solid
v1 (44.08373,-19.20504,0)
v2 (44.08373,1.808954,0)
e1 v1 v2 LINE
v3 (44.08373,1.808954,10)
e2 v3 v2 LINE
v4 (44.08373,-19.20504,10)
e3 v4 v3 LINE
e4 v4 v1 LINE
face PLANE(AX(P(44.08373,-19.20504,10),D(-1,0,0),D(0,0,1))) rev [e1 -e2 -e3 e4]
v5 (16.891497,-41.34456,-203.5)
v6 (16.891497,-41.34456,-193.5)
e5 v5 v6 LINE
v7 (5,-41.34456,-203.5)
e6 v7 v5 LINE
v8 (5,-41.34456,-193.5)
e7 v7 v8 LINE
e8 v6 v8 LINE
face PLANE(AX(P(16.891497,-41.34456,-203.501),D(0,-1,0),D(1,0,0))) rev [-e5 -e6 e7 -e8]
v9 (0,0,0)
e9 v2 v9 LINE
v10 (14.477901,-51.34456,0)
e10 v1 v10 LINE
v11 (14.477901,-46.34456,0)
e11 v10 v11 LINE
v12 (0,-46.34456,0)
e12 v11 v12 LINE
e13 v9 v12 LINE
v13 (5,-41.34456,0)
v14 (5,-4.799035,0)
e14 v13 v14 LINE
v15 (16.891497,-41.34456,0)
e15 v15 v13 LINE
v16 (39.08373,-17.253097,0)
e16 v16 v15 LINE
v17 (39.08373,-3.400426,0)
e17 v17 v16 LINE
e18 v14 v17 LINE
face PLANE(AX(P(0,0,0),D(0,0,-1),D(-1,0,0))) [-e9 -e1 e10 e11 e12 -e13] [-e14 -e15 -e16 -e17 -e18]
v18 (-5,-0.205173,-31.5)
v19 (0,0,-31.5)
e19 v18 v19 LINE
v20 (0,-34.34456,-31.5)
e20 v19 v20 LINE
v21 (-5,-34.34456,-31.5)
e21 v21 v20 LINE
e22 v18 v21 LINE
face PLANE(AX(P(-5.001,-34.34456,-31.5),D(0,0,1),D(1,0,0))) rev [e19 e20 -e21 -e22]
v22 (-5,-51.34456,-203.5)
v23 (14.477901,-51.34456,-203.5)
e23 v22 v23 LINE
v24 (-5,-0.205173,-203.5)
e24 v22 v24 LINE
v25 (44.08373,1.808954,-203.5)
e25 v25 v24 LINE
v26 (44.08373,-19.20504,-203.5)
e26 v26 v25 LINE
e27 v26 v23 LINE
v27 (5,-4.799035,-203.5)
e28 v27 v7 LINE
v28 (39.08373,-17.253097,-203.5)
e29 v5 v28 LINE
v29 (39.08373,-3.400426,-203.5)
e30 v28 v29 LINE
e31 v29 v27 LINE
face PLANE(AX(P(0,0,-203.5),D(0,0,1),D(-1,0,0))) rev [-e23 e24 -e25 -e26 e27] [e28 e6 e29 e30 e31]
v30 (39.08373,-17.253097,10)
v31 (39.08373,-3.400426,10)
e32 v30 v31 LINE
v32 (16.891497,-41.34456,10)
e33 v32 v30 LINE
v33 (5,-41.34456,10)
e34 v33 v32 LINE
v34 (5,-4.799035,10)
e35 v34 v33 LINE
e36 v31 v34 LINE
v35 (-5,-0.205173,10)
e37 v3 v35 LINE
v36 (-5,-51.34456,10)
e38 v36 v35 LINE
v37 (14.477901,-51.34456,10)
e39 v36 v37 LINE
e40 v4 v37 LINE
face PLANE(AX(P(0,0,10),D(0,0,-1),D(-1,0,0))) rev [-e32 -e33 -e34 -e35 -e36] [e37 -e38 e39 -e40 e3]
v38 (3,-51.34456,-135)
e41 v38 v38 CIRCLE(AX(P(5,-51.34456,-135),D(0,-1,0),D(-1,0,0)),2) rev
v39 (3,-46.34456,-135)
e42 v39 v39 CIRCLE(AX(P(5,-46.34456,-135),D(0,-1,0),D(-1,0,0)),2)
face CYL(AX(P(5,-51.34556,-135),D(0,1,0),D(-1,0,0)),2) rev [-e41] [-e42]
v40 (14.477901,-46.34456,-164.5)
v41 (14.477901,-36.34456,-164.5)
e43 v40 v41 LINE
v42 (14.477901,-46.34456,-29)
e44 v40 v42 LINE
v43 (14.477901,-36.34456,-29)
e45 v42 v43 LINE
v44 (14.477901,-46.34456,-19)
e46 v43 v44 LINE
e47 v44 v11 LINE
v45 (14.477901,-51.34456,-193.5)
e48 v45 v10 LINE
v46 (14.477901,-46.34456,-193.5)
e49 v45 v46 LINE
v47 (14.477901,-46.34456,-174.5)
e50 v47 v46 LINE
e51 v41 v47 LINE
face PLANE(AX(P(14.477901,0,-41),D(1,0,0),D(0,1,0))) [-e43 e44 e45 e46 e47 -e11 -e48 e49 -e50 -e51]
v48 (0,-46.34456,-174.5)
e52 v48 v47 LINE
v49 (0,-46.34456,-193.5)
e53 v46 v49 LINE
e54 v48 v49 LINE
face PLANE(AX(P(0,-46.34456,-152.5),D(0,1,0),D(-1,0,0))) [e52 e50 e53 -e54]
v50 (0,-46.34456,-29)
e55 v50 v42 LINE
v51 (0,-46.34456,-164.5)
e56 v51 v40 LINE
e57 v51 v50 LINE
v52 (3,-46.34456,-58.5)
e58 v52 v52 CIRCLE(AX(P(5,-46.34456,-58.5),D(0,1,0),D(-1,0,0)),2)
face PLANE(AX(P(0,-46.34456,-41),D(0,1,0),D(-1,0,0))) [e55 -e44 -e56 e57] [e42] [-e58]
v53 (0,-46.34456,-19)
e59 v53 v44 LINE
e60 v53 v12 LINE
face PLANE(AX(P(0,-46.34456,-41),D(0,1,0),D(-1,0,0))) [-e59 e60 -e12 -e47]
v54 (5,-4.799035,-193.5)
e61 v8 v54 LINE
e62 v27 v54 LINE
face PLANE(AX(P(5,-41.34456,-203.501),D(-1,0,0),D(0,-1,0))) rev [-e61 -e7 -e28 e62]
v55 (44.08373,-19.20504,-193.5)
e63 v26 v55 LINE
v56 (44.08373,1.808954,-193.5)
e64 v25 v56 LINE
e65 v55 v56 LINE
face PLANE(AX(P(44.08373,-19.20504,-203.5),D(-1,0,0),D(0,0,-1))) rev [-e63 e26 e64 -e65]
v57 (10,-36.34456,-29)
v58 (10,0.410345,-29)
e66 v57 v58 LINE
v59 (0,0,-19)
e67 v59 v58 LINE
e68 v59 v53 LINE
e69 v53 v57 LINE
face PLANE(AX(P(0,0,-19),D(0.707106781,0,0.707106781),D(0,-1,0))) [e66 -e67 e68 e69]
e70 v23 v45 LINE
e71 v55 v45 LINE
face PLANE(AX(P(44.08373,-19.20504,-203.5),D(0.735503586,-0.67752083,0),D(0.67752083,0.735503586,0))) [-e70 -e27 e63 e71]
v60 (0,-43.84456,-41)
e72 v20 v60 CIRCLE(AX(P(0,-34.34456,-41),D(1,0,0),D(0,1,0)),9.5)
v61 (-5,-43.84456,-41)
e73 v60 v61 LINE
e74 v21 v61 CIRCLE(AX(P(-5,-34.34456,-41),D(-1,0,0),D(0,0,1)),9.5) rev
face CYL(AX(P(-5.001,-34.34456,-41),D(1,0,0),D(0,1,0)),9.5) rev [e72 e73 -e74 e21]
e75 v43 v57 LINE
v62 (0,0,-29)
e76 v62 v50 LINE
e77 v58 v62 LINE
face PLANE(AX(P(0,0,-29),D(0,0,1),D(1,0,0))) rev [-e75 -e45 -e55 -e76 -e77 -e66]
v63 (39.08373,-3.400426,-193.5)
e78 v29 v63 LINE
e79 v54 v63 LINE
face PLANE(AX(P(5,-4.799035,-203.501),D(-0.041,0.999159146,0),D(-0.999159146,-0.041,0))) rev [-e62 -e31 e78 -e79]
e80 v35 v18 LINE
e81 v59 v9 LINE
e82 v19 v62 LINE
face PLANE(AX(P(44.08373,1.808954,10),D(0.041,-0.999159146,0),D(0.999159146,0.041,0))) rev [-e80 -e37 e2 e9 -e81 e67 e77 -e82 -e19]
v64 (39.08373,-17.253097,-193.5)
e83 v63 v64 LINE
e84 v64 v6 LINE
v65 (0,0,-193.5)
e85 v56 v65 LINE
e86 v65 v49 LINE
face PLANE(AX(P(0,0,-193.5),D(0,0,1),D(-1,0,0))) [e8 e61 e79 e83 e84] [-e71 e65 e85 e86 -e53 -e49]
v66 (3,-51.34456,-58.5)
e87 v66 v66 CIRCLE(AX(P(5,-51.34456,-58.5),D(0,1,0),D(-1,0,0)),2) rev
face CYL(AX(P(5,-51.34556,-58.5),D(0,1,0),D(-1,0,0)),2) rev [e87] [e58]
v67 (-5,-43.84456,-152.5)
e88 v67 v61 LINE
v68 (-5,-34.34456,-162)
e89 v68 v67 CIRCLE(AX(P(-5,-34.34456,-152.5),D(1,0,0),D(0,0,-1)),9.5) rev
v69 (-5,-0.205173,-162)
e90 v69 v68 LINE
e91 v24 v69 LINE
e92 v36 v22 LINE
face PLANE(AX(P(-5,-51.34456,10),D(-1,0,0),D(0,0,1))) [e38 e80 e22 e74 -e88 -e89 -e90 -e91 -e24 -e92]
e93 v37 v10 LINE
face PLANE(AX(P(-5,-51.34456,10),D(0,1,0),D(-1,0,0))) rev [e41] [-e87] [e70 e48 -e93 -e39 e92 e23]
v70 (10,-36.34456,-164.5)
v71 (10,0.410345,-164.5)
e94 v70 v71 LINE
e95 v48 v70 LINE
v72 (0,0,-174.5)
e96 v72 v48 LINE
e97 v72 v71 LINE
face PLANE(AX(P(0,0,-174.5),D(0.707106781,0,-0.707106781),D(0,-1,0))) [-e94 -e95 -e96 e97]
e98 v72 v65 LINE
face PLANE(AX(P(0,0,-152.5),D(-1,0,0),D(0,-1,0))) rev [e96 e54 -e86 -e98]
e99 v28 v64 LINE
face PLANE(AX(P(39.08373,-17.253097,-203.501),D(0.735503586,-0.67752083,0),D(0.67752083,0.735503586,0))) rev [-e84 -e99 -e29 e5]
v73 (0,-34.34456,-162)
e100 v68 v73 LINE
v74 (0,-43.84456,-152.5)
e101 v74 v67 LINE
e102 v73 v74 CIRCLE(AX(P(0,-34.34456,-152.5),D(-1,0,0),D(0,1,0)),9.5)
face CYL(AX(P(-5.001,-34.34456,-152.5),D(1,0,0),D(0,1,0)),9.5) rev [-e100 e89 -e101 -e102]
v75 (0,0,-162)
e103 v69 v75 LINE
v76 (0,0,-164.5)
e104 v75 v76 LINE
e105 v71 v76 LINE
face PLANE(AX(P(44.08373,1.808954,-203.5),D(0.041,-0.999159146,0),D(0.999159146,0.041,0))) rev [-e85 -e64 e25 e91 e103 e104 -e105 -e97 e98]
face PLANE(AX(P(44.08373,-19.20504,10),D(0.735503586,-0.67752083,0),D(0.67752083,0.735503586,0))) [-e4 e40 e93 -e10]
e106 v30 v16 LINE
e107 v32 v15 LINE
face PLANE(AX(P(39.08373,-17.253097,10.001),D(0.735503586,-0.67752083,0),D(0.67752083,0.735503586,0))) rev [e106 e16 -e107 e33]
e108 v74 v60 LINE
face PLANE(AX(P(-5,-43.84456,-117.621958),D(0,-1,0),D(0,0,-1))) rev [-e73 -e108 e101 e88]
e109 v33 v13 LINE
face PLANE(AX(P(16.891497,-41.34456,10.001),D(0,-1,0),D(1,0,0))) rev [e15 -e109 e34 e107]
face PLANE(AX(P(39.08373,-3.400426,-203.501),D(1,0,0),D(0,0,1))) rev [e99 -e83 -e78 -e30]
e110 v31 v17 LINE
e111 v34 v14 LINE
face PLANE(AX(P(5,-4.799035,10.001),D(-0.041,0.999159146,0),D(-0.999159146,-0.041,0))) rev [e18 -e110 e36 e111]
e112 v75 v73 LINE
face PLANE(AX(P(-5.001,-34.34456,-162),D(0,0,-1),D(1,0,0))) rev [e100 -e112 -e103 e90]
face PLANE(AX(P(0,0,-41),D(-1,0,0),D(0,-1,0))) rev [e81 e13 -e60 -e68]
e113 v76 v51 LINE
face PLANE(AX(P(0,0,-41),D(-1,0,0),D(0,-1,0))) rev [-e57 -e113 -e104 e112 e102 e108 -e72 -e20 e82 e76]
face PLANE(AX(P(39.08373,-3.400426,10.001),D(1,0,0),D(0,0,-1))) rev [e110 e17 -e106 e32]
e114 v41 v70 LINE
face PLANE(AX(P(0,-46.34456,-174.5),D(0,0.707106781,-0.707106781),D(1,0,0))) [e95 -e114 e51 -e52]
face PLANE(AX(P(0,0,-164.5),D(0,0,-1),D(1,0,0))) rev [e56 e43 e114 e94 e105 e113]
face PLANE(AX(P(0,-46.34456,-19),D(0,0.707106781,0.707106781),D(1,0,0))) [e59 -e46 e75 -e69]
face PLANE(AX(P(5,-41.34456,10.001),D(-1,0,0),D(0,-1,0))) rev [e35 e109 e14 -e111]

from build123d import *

# Parameters (mm, degrees)
BOSS_EXTRUDE1_DEPTH  = 10
BOSS_EXTRUDE6_DEPTH  = 41
CUT_EXTRUDE1_REACH   = 81.124
CUT_EXTRUDE2_REACH   = 81.124
BOSS_EXTRUDE9_DEPTH  = 10
CHAMFER3_SIZE        = 10
BOSS_EXTRUDE10_DEPTH = 55.75
CUT_EXTRUDE3_REACH   = 118.716
SKETCH12_R           = 2


with BuildPart() as part:
    # Sketch2 → Boss-Extrude1 (new body)
    with BuildSketch(Plane.XY):
        Polygon((-5, -51.344559606), (-5, -0.20517252), (44.083730464, 1.808954014), (44.083730464, -19.205040291), (14.477900916, -51.344559606), align=None)
    extrude(amount=BOSS_EXTRUDE1_DEPTH)

    # Sketch2<5> → Boss-Extrude6 (add)
    with BuildSketch(Plane.XY):
        Polygon((-5, -51.344559606), (14.477900916, -51.344559606), (14.477900916, -46.344559606), (0, -46.344559606), (0, 0), (-5, -0.20517252), align=None)
    extrude(amount=-BOSS_EXTRUDE6_DEPTH)

    # Sketch6 → Cut-Extrude1 (cut, up to next)
    with BuildSketch(Plane(origin=(0, 0, 0), x_dir=(0, 0, -1), z_dir=(1, 0, 0)), mode=Mode.PRIVATE) as cut_extrude1_sk1:
        with BuildLine():
            Line((31.5, 0), (41, 0))
            Line((41, 0), (41, -24.844559606))
            ThreePointArc((41, -24.844559606), (47.717514421, -41.062074027), (31.5, -34.344559606))
            Line((31.5, -34.344559606), (31.5, 0))
        make_face()
    cut_extrude1_tool1 = extrude(cut_extrude1_sk1.sketch, amount=-CUT_EXTRUDE1_REACH, mode=Mode.PRIVATE) & part.part
    add(cut_extrude1_tool1.solids().sort_by_distance((0, -24.478408, -38.654556))[0], mode=Mode.SUBTRACT)

    # Sketch7 → Cut-Extrude2 (cut, up to next)
    with BuildSketch(Plane(origin=(0, 0, 0), x_dir=(-1, 0, 0), z_dir=(0, 0, -1)), mode=Mode.PRIVATE) as cut_extrude2_sk1:
        Polygon((-39.083730464, -17.253097249), (-16.891496625, -41.344559606), (-5, -41.344559606), (-5, -4.799035286), (-39.083730464, -3.400426311), align=None)
    cut_extrude2_tool1 = extrude(cut_extrude2_sk1.sketch, amount=-CUT_EXTRUDE2_REACH, mode=Mode.PRIVATE) & part.part
    add(cut_extrude2_tool1.solids().sort_by_distance((19.604261, -19.893914, 0))[0], mode=Mode.SUBTRACT)

    # Sketch10 → Boss-Extrude9 (add)
    with BuildSketch(Plane.XY.offset(-29)):
        Polygon((14.477900916, -46.344559606), (0, -46.344559606), (0, 0), (10, 0.41034504), (10, -36.344559606), (14.477900916, -36.344559606), align=None)
    extrude(amount=BOSS_EXTRUDE9_DEPTH)

    # Chamfer3
    chamfer3_edges = [part.edges().sort_by_distance(p)[0] for p in [
        (12.238950458, -36.344559606, -19),
        (10, -17.967107283, -19),
    ]]
    chamfer(chamfer3_edges, length=CHAMFER3_SIZE - 0.0001)  # a hair under: the kernel refuses the full size

    # Sketch11 → Boss-Extrude10 (add)
    with BuildSketch(Plane(origin=(0, 0, -41), x_dir=(-1, 0, 0), z_dir=(0, 0, -1))):
        Polygon((5, -51.344559606), (5, -43.844559606), (0, -43.844559606), (0, -46.344559606), (-14.477900916, -46.344559606), (-14.477900916, -51.344559606), align=None)
    extrude(amount=BOSS_EXTRUDE10_DEPTH)

    # Sketch12 → Cut-Extrude3 (cut, up to next)
    with BuildSketch(Plane(origin=(0, -46.344559606, 0), x_dir=(1, 0, 0), z_dir=(0, 1, 0)), mode=Mode.PRIVATE) as cut_extrude3_sk1:
        with Locations(Location((5, 58.5, 0), (0, 0, 180))):
            Circle(SKETCH12_R)
    cut_extrude3_tool1 = extrude(cut_extrude3_sk1.sketch, amount=-CUT_EXTRUDE3_REACH, mode=Mode.PRIVATE) & part.part
    add(cut_extrude3_tool1.solids().sort_by_distance((5, -46.34456, -58.5))[0], mode=Mode.SUBTRACT)

    # Mirror3: part across plane


with BuildPart() as part_1:
    add(part.part)
    add(part.part.mirror(Plane(origin=(0, 0, -96.75), x_dir=(1, 0, 0), z_dir=(0, 0, -1))))


solid = part_1.part
